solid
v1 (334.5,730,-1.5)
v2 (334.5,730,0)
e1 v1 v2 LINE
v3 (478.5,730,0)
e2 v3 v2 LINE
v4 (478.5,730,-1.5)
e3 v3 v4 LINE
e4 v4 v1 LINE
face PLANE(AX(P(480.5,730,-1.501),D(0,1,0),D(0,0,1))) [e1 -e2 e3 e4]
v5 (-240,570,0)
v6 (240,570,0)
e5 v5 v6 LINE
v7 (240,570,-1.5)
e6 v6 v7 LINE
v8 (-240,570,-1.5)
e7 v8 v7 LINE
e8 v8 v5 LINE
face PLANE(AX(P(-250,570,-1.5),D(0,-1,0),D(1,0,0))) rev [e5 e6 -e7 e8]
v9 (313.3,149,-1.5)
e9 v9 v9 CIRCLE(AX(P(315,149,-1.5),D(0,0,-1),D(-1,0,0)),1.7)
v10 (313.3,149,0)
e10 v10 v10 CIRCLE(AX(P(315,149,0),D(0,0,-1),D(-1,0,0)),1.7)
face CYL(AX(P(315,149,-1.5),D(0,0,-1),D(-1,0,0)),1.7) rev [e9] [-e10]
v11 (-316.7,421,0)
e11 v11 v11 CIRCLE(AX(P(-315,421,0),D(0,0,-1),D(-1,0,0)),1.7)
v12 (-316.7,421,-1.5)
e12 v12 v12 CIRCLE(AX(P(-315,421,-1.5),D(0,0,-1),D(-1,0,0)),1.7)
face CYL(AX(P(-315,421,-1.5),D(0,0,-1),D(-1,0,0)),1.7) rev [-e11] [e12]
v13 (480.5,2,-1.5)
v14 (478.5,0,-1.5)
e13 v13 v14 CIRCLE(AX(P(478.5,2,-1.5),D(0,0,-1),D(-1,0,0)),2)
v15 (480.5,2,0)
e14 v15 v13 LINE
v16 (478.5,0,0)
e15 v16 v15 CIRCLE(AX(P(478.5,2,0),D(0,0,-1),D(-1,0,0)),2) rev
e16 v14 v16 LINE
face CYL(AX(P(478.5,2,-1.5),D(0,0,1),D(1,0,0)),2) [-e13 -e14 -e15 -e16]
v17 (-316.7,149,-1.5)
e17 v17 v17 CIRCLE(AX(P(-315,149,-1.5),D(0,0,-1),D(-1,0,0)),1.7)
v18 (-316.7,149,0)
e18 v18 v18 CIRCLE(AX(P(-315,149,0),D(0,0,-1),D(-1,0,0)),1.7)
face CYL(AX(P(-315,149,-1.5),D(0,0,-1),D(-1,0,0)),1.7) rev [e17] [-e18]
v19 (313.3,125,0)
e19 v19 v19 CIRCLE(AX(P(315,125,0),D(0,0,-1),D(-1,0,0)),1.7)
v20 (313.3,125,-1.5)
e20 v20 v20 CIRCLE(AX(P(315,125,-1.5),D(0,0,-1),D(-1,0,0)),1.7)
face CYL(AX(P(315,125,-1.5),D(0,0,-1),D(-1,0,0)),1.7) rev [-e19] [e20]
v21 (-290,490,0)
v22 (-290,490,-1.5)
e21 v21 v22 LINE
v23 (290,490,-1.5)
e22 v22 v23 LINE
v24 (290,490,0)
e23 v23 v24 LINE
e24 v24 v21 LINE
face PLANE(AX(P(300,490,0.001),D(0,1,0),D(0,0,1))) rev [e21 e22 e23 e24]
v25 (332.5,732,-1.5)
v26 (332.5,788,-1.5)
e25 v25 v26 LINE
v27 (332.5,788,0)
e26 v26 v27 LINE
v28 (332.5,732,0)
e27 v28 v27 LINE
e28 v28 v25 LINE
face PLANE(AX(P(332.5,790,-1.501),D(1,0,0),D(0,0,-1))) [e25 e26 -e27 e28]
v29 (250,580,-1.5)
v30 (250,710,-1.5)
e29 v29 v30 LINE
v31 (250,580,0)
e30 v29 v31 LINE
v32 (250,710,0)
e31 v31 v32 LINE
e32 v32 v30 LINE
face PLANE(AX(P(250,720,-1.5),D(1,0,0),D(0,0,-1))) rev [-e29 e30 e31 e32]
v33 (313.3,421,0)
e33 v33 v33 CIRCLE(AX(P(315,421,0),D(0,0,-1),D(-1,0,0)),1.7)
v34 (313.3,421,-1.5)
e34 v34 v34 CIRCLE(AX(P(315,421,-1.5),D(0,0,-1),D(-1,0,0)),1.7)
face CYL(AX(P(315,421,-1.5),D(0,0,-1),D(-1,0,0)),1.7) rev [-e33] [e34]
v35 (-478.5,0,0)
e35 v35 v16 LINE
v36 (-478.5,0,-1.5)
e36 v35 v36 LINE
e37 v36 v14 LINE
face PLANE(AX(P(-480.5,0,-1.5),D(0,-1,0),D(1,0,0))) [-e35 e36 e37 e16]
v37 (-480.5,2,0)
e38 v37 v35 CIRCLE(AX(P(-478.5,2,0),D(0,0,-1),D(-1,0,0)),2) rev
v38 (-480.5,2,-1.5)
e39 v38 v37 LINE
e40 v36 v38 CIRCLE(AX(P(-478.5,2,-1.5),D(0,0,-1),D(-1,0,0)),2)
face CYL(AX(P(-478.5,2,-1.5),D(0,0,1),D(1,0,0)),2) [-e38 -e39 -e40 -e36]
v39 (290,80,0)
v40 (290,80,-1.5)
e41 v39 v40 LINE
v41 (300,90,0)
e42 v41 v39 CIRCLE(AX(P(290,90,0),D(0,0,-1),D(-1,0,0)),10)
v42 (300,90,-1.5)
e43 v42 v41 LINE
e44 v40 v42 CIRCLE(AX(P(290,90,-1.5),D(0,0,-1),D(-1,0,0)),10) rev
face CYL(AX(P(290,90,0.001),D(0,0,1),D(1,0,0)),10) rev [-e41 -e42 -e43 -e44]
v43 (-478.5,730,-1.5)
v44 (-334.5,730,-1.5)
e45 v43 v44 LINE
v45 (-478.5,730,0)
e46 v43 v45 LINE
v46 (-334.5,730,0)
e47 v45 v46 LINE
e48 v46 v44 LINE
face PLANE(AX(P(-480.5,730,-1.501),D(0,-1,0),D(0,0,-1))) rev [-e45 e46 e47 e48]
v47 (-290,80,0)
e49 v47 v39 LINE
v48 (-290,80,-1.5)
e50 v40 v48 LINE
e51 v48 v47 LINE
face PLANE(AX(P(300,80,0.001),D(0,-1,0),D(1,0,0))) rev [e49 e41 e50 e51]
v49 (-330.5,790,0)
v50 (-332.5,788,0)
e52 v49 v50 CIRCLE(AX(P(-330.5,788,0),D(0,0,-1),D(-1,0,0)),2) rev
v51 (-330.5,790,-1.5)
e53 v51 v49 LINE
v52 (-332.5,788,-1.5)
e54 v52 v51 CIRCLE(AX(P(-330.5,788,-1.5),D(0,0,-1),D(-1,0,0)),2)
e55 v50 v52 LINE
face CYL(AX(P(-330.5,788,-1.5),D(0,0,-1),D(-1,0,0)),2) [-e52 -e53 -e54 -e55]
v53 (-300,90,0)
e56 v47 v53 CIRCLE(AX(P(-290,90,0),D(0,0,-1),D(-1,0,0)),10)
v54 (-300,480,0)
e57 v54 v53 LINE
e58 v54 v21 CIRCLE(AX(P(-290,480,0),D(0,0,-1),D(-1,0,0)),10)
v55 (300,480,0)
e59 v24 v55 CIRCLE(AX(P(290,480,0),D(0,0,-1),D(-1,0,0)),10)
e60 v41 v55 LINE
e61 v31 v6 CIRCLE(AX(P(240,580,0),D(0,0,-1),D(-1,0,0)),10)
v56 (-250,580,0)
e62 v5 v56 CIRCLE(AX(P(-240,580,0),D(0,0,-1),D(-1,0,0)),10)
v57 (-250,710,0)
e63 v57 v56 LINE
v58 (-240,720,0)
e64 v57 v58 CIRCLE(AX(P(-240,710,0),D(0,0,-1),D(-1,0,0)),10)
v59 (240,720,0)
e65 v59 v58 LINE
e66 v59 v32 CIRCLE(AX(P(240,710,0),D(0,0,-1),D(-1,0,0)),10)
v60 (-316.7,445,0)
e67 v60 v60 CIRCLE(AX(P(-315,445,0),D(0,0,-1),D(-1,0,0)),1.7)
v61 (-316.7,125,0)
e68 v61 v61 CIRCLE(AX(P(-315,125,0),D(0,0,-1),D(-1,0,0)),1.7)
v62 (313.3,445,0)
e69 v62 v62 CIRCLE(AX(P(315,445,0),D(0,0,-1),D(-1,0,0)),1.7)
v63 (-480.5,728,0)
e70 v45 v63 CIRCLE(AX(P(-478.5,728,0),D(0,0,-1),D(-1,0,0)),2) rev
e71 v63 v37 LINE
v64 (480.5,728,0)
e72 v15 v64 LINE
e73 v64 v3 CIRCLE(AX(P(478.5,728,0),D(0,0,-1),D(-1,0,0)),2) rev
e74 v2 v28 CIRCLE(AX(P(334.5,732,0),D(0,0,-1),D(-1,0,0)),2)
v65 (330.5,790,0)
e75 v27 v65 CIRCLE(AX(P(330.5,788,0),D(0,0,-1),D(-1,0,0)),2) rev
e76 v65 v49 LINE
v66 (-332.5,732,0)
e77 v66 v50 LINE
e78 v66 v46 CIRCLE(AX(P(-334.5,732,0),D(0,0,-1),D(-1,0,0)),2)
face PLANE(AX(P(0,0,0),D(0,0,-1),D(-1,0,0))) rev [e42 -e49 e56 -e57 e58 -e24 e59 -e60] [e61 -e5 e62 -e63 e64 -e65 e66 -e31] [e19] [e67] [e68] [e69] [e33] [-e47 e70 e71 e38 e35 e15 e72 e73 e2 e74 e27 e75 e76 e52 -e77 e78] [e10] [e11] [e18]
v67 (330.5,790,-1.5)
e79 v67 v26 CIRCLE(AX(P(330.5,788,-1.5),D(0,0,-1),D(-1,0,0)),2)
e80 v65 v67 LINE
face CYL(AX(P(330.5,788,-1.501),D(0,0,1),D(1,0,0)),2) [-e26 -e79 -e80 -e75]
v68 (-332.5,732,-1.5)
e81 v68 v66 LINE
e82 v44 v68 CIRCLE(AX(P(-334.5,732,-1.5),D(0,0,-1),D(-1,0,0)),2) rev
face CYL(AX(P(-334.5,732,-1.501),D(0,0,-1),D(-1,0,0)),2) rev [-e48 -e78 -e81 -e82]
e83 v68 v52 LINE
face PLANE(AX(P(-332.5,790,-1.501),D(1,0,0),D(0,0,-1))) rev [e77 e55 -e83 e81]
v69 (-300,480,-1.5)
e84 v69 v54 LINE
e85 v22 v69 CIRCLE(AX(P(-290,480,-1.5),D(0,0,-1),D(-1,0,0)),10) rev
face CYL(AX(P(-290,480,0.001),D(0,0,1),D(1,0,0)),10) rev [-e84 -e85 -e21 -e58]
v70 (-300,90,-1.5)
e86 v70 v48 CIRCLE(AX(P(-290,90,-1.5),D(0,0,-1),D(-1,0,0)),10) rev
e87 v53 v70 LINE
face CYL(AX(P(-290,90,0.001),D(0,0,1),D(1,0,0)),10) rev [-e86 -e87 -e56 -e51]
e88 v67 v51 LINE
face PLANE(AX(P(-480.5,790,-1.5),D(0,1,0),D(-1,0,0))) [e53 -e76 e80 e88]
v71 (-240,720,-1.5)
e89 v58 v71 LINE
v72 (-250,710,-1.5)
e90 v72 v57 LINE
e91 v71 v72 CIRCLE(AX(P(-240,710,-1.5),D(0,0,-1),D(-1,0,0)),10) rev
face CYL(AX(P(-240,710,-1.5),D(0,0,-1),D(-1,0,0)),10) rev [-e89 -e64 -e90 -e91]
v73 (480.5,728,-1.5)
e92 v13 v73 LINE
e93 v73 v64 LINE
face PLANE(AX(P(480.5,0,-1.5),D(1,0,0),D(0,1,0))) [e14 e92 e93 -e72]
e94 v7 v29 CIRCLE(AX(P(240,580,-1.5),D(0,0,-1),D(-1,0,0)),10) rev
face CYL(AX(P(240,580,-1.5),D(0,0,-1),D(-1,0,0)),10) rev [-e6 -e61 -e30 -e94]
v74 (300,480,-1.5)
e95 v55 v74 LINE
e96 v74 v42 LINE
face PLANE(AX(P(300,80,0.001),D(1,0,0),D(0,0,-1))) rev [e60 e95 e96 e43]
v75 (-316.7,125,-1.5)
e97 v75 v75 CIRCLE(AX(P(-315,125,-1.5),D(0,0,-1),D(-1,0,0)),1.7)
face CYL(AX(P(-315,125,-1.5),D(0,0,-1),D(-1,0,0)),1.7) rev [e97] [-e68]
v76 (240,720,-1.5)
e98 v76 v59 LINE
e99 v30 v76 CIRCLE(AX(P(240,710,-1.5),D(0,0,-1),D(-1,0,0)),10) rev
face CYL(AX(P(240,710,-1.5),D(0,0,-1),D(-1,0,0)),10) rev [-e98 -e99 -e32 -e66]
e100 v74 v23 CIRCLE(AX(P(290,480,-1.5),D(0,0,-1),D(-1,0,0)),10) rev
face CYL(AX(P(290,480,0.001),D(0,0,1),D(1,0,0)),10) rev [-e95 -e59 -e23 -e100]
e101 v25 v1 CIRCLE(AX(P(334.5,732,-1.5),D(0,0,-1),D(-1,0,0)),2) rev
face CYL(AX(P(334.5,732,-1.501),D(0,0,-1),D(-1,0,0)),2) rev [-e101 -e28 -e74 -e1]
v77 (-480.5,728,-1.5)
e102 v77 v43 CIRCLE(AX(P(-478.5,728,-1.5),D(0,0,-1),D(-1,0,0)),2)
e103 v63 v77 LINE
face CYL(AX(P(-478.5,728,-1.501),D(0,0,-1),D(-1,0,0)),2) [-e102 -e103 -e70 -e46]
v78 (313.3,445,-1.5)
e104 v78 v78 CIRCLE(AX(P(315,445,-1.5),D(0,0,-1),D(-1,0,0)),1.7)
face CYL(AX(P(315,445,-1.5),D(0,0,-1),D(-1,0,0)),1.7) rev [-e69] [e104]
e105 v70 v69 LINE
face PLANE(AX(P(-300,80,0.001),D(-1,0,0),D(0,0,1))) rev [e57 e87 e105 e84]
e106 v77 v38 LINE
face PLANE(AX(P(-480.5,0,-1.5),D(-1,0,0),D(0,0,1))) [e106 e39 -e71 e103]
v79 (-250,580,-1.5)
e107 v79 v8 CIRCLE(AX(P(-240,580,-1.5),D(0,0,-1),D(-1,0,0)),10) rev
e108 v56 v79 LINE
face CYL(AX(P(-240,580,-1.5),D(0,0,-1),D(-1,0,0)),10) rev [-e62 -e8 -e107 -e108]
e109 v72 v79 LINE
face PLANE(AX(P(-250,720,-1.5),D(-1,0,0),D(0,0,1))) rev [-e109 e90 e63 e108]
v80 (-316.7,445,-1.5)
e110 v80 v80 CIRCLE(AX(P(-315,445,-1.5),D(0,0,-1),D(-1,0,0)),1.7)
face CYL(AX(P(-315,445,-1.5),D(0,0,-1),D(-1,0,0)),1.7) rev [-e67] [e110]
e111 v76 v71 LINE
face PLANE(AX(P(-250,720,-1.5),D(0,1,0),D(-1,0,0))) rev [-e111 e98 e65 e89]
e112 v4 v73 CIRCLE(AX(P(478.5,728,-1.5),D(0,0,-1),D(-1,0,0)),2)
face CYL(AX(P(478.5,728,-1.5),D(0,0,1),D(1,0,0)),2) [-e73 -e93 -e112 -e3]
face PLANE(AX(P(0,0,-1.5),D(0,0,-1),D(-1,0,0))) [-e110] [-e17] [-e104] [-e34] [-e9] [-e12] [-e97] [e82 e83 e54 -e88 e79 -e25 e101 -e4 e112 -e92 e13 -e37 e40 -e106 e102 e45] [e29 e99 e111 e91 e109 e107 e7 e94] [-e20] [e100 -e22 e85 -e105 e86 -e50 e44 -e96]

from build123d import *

# Parameters (mm, degrees)
SKETCH1_W            = 961
SKETCH1_H            = 790
SKETCH1_W_2          = 500
SKETCH1_H_2          = 150
BASE_FLANGE1_DEPTH   = 1.5
CUT_EXTRUDE1_REACH   = 926.653
SKETCH2_W            = 148
SKETCH2_H            = 60
CUT_EXTRUDE2_REACH   = 926.653
SKETCH3_W            = 600
SKETCH3_H            = 410
M3_CLEARANCE_HOLE1_D = 3.4
FILLET1_R            = 10
FILLET2_R            = 2


# Sheet-metal steps are written as plain solids
with BuildPart() as part:
    # Sketch1 → Base-Flange1 (new body)
    with BuildSketch(Plane.XY):
        with Locations((0, 395)):
            Rectangle(SKETCH1_W, SKETCH1_H)
        with Locations((0, 645)):
            Rectangle(SKETCH1_W_2, SKETCH1_H_2, mode=Mode.SUBTRACT)
    extrude(amount=-BASE_FLANGE1_DEPTH)

    # Sketch2 → Cut-Extrude1 (cut, up to next)
    with BuildSketch(Plane.XY, mode=Mode.PRIVATE) as cut_extrude1_sk1:
        with Locations((-406.5, 760)):
            Rectangle(SKETCH2_W, SKETCH2_H)
    cut_extrude1_tool1 = extrude(cut_extrude1_sk1.sketch, amount=-CUT_EXTRUDE1_REACH, mode=Mode.PRIVATE) & part.part
    cut_extrude1 = cut_extrude1_tool1.solids().sort_by_distance((-406.5, 760, 0))[0]
    add(cut_extrude1, mode=Mode.SUBTRACT)

    # Mirror1: Cut-Extrude1 across plane
    add(cut_extrude1.mirror(Plane(origin=(0, 0, 0), x_dir=(0, 0, 1), z_dir=(1, 0, 0))), mode=Mode.SUBTRACT)

    # Sketch3 → Cut-Extrude2 (cut, up to next)
    with BuildSketch(Plane(origin=(0, 0, -1.5), x_dir=(-1, 0, 0), z_dir=(0, 0, -1)), mode=Mode.PRIVATE) as cut_extrude2_sk1:
        with Locations((0, 285)):
            Rectangle(SKETCH3_W, SKETCH3_H)
    cut_extrude2_tool1 = extrude(cut_extrude2_sk1.sketch, amount=-CUT_EXTRUDE2_REACH, mode=Mode.PRIVATE) & part.part
    add(cut_extrude2_tool1.solids().sort_by_distance((0, 285, -1.5))[0], mode=Mode.SUBTRACT)

    # M3 Clearance Hole1 (through all)
    with Locations(Plane(origin=(0, 0, -1.5), x_dir=(-1, 0, 0), z_dir=(0, 0, -1))):
        with Locations((-315, 125), (-315, 149), (-315, 445), (-315, 421)):
            m3_clearance_hole1 = Hole(M3_CLEARANCE_HOLE1_D / 2)

    # Mirror2: M3 Clearance Hole1 across plane
    add(m3_clearance_hole1.mirror(Plane(origin=(0, 0, 0), x_dir=(0, 0, 1), z_dir=(1, 0, 0))), mode=Mode.SUBTRACT)

    # Fillet1
    fillet1_edges = [part.edges().sort_by_distance(p)[0] for p in [
        (-250, 720, -0.75),
        (250, 720, -0.75),
        (250, 570, -0.75),
        (-250, 570, -0.75),
        (-300, 490, -0.75),
        (-300, 80, -0.75),
        (300, 80, -0.75),
        (300, 490, -0.75),
    ]]
    fillet(fillet1_edges, radius=FILLET1_R)

    # Fillet2
    fillet2_edges = [part.edges().sort_by_distance(p)[0] for p in [
        (-480.5, 730, -0.75),
        (-332.5, 790, -0.75),
        (-332.5, 730, -0.75),
        (480.5, 730, -0.75),
        (332.5, 730, -0.75),
        (332.5, 790, -0.75),
        (480.5, 0, -0.75),
        (-480.5, 0, -0.75),
    ]]
    fillet(fillet2_edges, radius=FILLET2_R)


solid = part.part
